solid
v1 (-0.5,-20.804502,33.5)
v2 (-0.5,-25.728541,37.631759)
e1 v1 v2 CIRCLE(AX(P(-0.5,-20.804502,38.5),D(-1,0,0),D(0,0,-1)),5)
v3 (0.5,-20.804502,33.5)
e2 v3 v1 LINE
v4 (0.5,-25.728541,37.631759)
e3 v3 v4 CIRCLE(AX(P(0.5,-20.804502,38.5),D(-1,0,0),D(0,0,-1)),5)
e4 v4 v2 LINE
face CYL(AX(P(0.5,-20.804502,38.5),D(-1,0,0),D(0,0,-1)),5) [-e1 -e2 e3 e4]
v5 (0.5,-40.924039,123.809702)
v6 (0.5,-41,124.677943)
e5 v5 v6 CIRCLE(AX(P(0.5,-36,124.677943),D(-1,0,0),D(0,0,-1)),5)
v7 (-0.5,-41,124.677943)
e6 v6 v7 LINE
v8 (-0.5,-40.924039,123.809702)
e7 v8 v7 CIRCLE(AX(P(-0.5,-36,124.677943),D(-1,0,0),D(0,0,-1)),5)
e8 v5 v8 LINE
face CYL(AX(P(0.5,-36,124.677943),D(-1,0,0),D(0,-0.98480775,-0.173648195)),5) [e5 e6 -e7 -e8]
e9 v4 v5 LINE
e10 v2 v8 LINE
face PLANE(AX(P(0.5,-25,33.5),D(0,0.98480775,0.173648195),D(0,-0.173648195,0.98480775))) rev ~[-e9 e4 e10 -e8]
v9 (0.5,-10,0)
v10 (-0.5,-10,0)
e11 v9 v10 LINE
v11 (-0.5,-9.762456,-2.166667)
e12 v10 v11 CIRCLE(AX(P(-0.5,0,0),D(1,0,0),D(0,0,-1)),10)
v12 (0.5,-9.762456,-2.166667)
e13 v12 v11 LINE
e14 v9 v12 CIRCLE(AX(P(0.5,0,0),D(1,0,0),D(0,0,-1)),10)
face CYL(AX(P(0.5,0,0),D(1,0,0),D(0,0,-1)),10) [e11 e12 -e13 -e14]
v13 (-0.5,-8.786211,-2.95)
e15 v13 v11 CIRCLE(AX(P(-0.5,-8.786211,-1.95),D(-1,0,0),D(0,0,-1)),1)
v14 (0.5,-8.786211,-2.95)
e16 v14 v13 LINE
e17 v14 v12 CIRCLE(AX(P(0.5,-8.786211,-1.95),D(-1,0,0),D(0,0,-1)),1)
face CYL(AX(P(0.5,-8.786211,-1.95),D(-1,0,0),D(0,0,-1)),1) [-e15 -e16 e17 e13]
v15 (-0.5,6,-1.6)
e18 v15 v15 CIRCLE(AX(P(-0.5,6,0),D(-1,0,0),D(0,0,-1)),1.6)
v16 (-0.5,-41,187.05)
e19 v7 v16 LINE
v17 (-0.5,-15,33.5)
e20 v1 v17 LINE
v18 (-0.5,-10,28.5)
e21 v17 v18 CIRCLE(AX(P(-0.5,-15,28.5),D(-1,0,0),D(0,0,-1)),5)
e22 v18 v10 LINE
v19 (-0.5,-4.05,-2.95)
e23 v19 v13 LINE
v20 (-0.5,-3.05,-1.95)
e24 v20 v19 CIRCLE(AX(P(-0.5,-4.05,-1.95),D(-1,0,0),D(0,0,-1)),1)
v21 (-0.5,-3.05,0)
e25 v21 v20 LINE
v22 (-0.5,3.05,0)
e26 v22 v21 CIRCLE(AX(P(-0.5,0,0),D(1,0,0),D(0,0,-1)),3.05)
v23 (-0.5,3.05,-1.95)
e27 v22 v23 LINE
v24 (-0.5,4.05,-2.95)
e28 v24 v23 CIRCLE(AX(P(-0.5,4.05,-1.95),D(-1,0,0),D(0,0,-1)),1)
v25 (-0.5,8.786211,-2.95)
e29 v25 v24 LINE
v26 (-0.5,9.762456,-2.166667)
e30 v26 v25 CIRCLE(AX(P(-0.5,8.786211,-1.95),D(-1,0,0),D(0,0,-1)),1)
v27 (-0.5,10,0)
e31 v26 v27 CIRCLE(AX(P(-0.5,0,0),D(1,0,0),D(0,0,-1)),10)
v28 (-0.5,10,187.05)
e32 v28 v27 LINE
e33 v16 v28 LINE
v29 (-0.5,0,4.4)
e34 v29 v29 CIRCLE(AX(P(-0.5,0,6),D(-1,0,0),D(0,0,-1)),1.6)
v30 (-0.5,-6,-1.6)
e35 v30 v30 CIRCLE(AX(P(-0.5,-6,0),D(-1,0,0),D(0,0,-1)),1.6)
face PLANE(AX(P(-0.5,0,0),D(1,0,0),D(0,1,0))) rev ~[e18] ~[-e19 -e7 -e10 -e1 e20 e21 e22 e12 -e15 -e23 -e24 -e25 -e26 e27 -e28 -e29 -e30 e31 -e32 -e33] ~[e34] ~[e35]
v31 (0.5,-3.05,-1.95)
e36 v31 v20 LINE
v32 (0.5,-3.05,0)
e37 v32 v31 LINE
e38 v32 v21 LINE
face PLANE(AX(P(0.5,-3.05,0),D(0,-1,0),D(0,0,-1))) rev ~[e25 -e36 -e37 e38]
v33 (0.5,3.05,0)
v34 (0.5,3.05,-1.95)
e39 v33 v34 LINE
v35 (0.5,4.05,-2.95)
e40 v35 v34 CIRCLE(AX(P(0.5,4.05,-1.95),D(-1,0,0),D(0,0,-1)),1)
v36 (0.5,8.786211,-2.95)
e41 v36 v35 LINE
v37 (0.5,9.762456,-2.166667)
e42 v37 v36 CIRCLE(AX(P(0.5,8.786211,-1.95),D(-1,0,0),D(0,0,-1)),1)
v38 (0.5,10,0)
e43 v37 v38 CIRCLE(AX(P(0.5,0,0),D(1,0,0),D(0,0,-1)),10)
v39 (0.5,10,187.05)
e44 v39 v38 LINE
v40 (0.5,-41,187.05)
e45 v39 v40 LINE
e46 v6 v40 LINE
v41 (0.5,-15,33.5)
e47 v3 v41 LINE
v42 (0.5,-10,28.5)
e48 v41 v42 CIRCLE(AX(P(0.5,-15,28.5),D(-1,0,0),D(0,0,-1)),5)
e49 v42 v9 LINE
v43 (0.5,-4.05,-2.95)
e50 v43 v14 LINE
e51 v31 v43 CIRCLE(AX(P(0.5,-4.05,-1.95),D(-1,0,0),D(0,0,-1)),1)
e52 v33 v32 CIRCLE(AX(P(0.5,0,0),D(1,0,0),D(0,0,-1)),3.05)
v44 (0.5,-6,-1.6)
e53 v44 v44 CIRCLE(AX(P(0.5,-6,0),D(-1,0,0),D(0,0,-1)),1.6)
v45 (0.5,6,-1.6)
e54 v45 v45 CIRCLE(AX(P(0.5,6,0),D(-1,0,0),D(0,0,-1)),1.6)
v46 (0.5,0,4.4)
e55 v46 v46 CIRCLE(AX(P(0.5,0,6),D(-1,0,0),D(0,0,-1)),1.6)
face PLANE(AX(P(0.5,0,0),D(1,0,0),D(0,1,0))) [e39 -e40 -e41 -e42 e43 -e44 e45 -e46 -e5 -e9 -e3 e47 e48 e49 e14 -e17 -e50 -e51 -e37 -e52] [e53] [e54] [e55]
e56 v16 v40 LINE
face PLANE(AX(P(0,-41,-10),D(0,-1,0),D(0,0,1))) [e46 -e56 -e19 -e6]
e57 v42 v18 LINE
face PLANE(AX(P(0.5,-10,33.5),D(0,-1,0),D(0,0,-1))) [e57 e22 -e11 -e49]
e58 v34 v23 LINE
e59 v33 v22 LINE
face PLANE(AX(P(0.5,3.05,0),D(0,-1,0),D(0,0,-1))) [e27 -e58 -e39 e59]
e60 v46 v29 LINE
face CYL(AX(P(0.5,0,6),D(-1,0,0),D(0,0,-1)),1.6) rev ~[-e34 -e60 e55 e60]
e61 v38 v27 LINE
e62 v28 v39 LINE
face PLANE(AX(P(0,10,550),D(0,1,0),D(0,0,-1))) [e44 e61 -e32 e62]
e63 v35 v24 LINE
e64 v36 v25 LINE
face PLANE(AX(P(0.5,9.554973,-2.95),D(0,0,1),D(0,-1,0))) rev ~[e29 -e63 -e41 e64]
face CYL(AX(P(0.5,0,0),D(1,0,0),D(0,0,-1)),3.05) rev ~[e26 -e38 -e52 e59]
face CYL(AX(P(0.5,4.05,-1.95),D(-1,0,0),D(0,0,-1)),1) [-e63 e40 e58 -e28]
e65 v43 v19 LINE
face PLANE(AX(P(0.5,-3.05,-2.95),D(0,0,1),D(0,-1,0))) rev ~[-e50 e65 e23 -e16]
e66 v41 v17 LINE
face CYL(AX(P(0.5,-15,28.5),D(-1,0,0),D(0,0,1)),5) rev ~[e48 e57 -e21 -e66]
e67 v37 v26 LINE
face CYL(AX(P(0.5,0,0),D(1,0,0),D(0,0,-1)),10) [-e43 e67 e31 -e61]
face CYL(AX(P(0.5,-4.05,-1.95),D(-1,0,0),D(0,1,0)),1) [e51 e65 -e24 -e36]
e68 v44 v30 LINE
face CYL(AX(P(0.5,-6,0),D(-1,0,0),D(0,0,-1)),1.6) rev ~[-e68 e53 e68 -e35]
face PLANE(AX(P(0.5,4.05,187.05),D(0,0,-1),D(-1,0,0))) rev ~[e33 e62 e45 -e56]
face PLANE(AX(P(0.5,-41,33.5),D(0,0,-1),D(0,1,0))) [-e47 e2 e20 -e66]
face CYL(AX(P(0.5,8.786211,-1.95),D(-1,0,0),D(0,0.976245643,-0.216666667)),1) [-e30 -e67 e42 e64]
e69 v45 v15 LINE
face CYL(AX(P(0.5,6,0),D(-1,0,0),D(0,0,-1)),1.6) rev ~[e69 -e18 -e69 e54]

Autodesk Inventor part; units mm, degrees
ref_plane "YZ Plane" through (0, 0, 0) normal (1, 0, 0) x (0, 1, 0)
ref_plane "XZ Plane" through (0, 0, 0) normal (0, 1, 0) x (-1, 0, 0)
ref_plane "XY Plane" through (0, 0, 0) normal (0, 0, 1) x (1, 0, 0)
sketch "スケッチ1" plane through (0, 0, 0) normal (1, 0, 0) x (0, 1, 0)
  line L0 (-41, 550) -> (10, 550)
  line L1 (10, 550) -> (10, -10)
  line L2 (10, -10) -> (-41, -10)
  line L3 (-41, -10) -> (-41, 550)
  line L4 (-41, 550) -> (10, -10) construction
  line L5 (10, 550) -> (-41, -10) construction
  point P0 (0, 0)
  dimension "d0" = 51
  dimension "d1" = 560
  dimension "d42" = 10
  dimension "d43" = 10
extrude "プレート1" add sketch "スケッチ1" along normal mid plane 1
sketch "スケッチ3" plane through (0.5, 0, 0) normal (1, 0, 0) x (0, 0, -1)
  circle A0 centre (0, 0) radius 6
  line L0 (10, 10) -> (10, -41) projected
  line L1 (-550, 10) -> (10, 10) projected
  point P0 (0, 0)
  point P1 (0, 6)
  point P2 (-6, 0)
  point P3 (0, -6)
  point P4 (6, 0)
  dimension "d13" = 12
  dimension "d14" = 10
  dimension "d15" = 10
  dimension "d18" = 360
  dimension "d44" = 0
hole "穴2" at (0.5, 6, 0) at (0.5, 0, 6) at (0.5, -6, 0) at (0.5, 0, -6) direction (-1, 0, 0) diameter 3.2 end through all clearance for "Socket Head Cap Screw" size "M3" standard "Ansi Metric M Profile"
sketch "スケッチ4" plane through (0.5, 0, 0) normal (1, 0, 0) x (0, 0, -1)
  circle A0 centre (0, 0) radius 3.05
  point P0 (0, 0)
  dimension "d27" = 6.1
extrude "押し出し1" cut sketch "スケッチ4" against normal blind 10
sketch "スケッチ5" plane through (0.5, 0, 0) normal (1, 0, 0) x (0, 0, -1)
  line L0 (10, -41) -> (-33.5, -41)
  line L1 (-33.5, -41) -> (-33.5, -10)
  line L2 (-33.5, -10) -> (10, -10)
  line L3 (10, -10) -> (10, -41)
  line L4 (-550, 10) -> (-53.5, 10)
  line L5 (-53.5, 10) -> (-53.5, -12)
  line L6 (-53.5, -12) -> (-550, -12)
  line L7 (-550, -12) -> (-550, 10)
  line L8 (10, -41) -> (-550, -41) projected
  circle A0 centre (0, 0) radius 3.05 projected
  circle A1 centre (0, 0) radius 3.05 projected
  line L9 (0, 3.05) -> (10, 3.05)
  line L10 (0, -3.05) -> (10, -3.05)
  line L11 (10, 10) -> (10, -41) projected
  circle A2 centre (0, 0) radius 10
  circle A3 centre (0, 6) radius 1.6 projected
  circle A4 centre (0, -6) radius 1.6 projected
  line L12 (-550, 10) -> (10, 10) projected
  line L13 (2.95, 10) -> (2.95, -10)
  point P0 (0, 0)
  point P1 (2.95, -3.05)
  point P2 (2.95, 3.05)
  point P3 (2.95, 0.7746)
  point P4 (2.95, -0.7746)
  point P5 (9.5235, -3.05)
  point P6 (0, -10)
  point P7 (0, 10)
  point P8 (9.5235, 3.05)
  point P9 (10, 0)
  point P10 (2.95, -9.555)
  point P11 (2.95, 9.555)
  dimension "d35" = 29
  dimension "d36" = 20
  dimension "d40" = 33.5
  dimension "d41" = 10
  dimension "d45" = 2.95
extrude "押し出し2" cut sketch "スケッチ5" against normal blind 10 contours L0 L1 L2 L3 | L2 L13 A2 L10 L11 | L2 A2 L13 | L10 A2 L11 | L13 L10 A2 | L10 L13 A0 L9 A2 | A2 L9 L11 | L12 L13 A2 | L10 A0 L13 | L9 A2 L13 L12 L11 | L9 L13 A2 | L13 A0 L9 picked at (5.1412, -2.2915)
fillet "コーナーR4" radius 1 4 edges at (0, -3.05, -2.95) (0, 3.05, -2.95) (0, 9.555, -2.95) (0, -9.555, -2.95)
sketch "スケッチ6" plane through (0.5, 0, 0) normal (1, 0, 0) x (0, 0, -1)
  line L0 (-33.5, -41) -> (-550, -41) projected
  line L1 (-33.5, -41) -> (-33.5, -10) projected
  line L2 (-33.5, -25) -> (-124.2405, -41)
  point P0 (0, 0)
  point P1 (-545, -41)
  point P2 (-33.5, -15)
  dimension "d51" = 10
  dimension "d52" = 16
extrude "押し出し3" cut sketch "スケッチ6" against normal blind 10
fillet "コーナーR5" radius 5 2 edges at (0, -25, 33.5) (0, -41, 124.2405)
fillet "コーナーR6" radius 5 2 edges at (0, -10, 33.5) (0, 10, 550)
ref_plane "作業平面1" through (0.5, 4.05, 187.05) normal (0, 0, -1) x (-1, 0, 0)
sketch "スケッチ7" plane through (0.5, 4.05, 187.05) normal (0, 0, -1) x (-1, 0, 0)
  line L0 (1, -45.05) -> (0, -45.05) projected
  line L1 (0, -45.05) -> (1, -45.05)
  line L2 (1, -45.05) -> (1, 5.95)
  line L3 (1, 5.95) -> (0, 5.95)
  line L4 (0, 5.95) -> (0, -45.05)
  point P0 (0.5, -4.05)
  point P1 (1, -45.05)
extrude "押し出し4" cut sketch "スケッチ7" against normal through all
equation "\"d15\" = d14"
equation "\"d25\" = Thickness"
equation "\"d2\" = Thickness"
equation "\"d43\" = d42"
equation "\"BendRadius\" = Thickness"
equation "\"BendReliefWidth\" = Thickness"
equation "\"BendReliefDepth\" = 0.5 * Thickness"
equation "\"CornerReliefSize\" = 4 * Thickness"
equation "\"MinimumRemnant\" = 2 * Thickness"
equation "\"TransitionRadius\" = BendRadius"
equation "\"JacobiRadiusSize\" = BendRadius"
equation "\"GapSize\" = Thickness"
equation "\"Thickness\" = 1"
properties part number "s_carbon_plate5" material "CFRP"
